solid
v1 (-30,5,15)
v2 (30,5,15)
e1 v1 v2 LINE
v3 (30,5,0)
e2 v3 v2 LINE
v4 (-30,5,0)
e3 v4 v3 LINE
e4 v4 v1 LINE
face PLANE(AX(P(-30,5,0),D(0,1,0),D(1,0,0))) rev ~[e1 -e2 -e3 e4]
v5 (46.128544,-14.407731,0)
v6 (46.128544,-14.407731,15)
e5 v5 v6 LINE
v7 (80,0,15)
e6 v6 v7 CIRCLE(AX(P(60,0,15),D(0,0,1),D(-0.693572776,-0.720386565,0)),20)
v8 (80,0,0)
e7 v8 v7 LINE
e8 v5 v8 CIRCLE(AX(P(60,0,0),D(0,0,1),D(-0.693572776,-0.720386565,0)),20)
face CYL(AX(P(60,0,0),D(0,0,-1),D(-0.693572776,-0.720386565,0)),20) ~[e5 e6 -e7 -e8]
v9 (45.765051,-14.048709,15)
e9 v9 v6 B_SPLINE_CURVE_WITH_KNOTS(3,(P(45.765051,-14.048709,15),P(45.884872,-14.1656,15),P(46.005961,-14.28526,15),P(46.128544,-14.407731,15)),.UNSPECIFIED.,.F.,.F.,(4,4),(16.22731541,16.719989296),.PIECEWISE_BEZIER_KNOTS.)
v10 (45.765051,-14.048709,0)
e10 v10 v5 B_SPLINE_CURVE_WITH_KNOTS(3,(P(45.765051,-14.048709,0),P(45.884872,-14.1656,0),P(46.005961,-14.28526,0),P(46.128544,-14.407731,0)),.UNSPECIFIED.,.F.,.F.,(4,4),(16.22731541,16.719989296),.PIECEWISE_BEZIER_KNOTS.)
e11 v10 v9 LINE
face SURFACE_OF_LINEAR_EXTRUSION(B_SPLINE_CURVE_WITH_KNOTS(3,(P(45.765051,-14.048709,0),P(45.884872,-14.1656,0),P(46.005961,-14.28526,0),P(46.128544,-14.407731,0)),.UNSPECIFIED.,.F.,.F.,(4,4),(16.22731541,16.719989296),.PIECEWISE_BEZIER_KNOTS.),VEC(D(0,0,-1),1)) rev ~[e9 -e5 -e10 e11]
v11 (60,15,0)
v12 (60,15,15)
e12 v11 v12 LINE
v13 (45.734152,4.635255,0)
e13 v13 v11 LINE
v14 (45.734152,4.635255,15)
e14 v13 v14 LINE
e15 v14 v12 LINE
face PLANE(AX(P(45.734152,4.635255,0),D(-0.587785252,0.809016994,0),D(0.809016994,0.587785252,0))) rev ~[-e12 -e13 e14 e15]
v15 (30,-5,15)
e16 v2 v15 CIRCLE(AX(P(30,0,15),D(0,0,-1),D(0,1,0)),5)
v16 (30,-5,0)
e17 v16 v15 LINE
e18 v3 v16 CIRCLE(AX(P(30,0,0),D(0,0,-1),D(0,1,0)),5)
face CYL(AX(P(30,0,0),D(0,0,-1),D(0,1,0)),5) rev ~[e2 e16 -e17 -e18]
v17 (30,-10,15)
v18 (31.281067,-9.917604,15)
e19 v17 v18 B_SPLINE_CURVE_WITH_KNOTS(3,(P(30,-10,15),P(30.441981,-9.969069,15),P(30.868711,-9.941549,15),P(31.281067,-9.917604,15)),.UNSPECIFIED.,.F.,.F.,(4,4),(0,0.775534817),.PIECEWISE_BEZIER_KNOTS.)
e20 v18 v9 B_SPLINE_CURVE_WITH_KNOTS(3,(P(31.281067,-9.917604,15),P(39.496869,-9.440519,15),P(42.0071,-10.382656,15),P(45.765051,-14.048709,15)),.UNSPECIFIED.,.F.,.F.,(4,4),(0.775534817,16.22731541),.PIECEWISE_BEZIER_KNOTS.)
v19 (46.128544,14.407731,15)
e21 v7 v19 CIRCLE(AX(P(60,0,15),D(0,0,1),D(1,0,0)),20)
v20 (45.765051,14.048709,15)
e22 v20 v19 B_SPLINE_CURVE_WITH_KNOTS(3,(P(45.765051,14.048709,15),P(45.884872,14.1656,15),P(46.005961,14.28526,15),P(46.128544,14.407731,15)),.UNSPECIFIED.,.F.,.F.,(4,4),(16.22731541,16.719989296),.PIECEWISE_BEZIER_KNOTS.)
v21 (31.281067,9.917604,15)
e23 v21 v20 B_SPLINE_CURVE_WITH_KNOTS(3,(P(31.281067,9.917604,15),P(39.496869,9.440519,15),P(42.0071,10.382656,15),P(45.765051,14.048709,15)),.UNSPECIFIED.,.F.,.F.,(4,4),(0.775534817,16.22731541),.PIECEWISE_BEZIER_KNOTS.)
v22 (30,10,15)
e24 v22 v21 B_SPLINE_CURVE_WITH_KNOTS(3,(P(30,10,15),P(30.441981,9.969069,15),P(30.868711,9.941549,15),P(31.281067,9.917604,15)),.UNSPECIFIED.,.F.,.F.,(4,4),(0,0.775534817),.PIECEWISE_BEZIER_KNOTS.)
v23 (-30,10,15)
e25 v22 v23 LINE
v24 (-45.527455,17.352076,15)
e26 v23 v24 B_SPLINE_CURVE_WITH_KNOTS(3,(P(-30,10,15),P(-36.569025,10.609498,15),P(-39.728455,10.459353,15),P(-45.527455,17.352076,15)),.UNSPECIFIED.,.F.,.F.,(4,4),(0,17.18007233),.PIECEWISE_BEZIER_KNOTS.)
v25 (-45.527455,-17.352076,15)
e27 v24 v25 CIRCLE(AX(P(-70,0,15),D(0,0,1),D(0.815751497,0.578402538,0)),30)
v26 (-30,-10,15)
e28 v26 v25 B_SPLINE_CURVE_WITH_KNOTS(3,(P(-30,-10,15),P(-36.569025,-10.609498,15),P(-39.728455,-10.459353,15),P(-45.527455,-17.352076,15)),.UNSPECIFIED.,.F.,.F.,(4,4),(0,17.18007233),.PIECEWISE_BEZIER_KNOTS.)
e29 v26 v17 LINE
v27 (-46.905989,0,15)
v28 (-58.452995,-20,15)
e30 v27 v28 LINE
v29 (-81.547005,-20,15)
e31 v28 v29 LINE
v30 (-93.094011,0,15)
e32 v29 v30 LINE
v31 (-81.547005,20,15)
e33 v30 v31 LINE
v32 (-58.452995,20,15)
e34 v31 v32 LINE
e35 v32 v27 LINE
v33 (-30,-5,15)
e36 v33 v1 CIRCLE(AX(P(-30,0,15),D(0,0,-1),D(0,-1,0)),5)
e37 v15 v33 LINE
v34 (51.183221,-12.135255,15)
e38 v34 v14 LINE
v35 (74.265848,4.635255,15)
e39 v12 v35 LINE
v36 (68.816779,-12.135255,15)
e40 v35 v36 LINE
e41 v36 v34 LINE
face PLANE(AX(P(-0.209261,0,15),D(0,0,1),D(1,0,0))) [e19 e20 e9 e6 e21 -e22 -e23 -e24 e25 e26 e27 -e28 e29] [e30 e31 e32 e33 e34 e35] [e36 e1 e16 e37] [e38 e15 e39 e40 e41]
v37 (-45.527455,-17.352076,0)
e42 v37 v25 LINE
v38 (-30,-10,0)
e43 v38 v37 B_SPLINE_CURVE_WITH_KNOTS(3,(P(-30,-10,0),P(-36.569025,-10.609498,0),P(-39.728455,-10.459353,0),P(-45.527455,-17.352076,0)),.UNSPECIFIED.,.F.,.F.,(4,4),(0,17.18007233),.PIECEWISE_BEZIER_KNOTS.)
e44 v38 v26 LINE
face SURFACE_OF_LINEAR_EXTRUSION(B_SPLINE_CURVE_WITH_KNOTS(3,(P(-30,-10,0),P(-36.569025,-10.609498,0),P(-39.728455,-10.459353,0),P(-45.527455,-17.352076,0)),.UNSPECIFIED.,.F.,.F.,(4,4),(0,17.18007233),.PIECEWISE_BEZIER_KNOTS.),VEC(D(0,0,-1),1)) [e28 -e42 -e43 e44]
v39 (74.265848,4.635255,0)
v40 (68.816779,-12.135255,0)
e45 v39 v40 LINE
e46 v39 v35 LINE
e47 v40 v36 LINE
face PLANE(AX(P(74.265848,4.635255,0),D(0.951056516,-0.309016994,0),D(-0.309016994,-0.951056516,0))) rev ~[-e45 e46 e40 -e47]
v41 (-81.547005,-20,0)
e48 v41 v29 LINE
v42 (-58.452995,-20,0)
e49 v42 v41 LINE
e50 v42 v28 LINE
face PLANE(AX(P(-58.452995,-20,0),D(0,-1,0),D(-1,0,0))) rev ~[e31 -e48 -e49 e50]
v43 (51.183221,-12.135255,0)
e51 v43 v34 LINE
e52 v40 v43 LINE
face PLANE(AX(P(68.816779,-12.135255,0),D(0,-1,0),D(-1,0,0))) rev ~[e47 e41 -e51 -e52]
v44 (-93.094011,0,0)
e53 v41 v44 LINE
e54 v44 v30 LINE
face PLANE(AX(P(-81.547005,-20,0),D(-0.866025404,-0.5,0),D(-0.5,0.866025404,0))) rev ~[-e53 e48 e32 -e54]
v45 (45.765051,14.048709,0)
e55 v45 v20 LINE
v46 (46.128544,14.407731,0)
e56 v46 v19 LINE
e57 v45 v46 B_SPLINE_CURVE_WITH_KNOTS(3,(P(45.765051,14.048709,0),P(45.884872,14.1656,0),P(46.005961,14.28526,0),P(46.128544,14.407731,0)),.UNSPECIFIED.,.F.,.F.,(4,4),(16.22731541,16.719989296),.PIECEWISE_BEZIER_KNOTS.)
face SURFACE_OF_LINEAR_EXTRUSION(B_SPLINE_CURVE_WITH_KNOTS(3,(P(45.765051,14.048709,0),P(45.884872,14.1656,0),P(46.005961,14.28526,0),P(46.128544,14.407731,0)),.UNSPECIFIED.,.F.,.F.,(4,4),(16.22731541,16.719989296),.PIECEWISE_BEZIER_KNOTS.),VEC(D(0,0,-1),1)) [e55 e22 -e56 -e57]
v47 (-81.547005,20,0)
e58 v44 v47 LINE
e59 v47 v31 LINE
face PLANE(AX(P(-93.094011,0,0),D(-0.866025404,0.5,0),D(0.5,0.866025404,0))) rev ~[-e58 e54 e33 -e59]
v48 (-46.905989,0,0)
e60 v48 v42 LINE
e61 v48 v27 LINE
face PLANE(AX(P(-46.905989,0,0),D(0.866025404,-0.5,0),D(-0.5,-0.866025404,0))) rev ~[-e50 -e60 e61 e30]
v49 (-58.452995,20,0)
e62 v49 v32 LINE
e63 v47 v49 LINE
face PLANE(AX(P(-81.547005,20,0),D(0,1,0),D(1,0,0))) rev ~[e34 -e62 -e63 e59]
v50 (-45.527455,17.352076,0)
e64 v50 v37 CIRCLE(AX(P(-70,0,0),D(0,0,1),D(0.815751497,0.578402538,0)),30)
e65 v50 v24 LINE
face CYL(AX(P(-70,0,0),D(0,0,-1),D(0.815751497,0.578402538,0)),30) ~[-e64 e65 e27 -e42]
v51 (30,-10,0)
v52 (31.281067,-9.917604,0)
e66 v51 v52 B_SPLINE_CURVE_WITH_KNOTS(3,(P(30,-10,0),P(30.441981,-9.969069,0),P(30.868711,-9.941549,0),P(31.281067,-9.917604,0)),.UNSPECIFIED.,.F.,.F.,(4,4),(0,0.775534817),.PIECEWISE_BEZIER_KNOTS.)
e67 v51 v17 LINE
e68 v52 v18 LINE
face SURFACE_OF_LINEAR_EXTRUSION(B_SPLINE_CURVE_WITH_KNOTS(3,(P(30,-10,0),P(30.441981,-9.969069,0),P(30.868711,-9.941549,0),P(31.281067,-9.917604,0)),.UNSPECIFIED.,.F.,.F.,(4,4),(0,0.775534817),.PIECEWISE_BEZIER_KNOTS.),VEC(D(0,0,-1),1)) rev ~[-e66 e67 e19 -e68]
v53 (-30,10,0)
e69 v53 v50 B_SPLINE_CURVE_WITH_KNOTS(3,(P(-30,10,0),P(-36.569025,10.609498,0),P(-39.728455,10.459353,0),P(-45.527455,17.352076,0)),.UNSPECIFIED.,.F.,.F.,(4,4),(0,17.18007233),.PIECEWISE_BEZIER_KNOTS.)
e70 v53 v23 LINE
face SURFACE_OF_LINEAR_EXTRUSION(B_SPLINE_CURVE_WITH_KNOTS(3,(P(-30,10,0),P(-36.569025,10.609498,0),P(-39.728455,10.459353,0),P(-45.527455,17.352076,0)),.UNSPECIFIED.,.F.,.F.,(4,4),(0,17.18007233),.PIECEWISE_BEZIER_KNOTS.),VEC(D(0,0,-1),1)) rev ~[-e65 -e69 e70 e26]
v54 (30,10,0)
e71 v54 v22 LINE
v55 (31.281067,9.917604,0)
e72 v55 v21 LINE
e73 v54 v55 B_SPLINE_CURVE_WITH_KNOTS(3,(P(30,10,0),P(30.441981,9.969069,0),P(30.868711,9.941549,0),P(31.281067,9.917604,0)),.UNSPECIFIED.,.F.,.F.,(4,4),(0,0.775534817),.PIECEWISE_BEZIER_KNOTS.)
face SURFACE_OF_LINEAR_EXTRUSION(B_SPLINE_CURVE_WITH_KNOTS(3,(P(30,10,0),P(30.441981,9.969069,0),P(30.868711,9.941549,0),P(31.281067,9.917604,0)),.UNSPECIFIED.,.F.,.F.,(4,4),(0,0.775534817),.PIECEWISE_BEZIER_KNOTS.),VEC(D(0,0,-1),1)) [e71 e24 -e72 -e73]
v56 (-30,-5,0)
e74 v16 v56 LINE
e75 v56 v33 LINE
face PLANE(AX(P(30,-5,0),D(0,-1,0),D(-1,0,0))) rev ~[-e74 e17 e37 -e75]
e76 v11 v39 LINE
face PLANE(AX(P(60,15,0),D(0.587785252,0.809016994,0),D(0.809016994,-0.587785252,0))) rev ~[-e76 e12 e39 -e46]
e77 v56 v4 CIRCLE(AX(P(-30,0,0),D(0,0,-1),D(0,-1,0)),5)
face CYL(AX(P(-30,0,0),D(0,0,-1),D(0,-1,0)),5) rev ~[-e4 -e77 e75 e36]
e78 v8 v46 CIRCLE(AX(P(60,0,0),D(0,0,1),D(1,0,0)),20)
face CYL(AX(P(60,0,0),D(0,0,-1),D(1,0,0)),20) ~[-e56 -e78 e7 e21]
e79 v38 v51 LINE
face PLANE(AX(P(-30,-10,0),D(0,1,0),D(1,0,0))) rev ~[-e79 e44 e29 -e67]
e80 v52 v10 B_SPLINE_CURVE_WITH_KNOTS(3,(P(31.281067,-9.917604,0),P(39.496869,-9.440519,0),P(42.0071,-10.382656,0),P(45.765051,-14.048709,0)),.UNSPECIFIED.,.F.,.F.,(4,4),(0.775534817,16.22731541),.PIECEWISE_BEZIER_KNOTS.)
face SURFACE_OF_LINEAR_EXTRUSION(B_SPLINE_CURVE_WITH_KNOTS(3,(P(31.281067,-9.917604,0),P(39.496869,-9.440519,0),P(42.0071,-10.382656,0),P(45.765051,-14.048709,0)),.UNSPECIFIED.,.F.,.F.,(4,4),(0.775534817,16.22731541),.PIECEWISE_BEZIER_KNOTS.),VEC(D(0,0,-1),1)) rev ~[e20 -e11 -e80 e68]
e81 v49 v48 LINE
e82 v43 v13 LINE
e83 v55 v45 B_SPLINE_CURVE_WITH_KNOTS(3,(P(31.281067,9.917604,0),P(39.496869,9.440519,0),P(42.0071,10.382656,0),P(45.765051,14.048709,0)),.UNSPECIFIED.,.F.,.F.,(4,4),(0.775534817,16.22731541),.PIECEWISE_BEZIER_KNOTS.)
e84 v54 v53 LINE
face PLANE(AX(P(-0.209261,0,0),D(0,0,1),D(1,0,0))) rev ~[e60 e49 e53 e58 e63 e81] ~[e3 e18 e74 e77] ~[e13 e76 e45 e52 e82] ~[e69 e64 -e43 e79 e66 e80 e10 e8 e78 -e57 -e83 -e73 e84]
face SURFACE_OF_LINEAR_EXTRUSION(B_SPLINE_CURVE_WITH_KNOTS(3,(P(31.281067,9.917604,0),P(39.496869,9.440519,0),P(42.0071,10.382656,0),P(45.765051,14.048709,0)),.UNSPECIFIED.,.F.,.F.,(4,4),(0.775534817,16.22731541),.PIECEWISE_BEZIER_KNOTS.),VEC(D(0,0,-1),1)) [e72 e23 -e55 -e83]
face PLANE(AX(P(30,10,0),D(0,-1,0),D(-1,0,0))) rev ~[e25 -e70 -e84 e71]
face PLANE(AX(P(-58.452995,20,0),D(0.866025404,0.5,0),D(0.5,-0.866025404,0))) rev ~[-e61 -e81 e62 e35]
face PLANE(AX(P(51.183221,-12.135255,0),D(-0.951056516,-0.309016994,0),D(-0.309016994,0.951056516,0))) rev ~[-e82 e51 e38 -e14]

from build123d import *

# Parameters (mm, degrees)
F1_DEPTH = 15


with BuildPart() as f1:
    # F0 (on Top) → F1 (new body)
    with BuildSketch(Plane.XY):
        with BuildLine():
            Line((30, 10), (-30, 10))
            ThreePointArc((-30, 10), (-37.0710678119, 7.0710678119), (-40, 0))
            ThreePointArc((-40, 0), (-37.0710678119, -7.0710678119), (-30, -10))
            Line((-30, -10), (30, -10))
            add(Edge.make_bspline(
                [(30, -10), (30.4419813549, -9.9690694458), (30.8687106597, -9.941549094), (31.2810670558, -9.9176039041)],
                knots=[0, 0, 0, 0, 0.775534817, 0.775534817, 0.775534817, 0.775534817], degree=3))
            ThreePointArc((31.2810670558, -9.9176039041), (37.51034856, -6.6026255768), (40, 4.32e-08))
            ThreePointArc((40, 4.32e-08), (37.5103485315, 6.6026256092), (31.2810670558, 9.9176039041))
            add(Edge.make_bspline(
                [(30, 10), (30.4419813549, 9.9690694458), (30.8687106597, 9.941549094), (31.2810670558, 9.9176039041)],
                knots=[0, 0, 0, 0, 0.775534817, 0.775534817, 0.775534817, 0.775534817], degree=3))
        make_face()
        with BuildLine():
            Line((30, -5), (-30, -5))
            ThreePointArc((-30, -5), (-35, 0), (-30, 5))
            Line((-30, 5), (30, 5))
            ThreePointArc((30, 5), (35, 0), (30, -5))
        make_face(mode=Mode.SUBTRACT)
        with BuildLine():
            ThreePointArc((-40, 0), (-37.0710678119, 7.0710678119), (-30, 10))
            add(Edge.make_bspline(
                [(-30, 10), (-36.5690253675, 10.6094982475), (-39.7284552455, 10.459353216), (-45.5274550985, 17.3520761307)],
                knots=[0, 0, 0, 0, 17.1800723301, 17.1800723301, 17.1800723301, 17.1800723301], degree=3))
            ThreePointArc((-45.5274550985, 17.3520761307), (-41.4152457852, 9.1055931426), (-40, 0))
        make_face()
        with BuildLine():
            ThreePointArc((-45.5274550985, -17.3520761307), (-41.4152457852, -9.1055931426), (-40, 0))
            ThreePointArc((-40, 0), (-41.4152457852, 9.1055931426), (-45.5274550985, 17.3520761307))
            ThreePointArc((-45.5274550985, 17.3520761307), (-100, 0), (-45.5274550985, -17.3520761307))
        make_face()
        Polygon((-93.0940107676, 0), (-81.5470053838, 20), (-58.4529946162, 20), (-46.9059892324, 0), (-58.4529946162, -20), (-81.5470053838, -20), align=None, mode=Mode.SUBTRACT)
        with BuildLine():
            ThreePointArc((-30, -10), (-37.0710678119, -7.0710678119), (-40, 0))
            ThreePointArc((-40, 0), (-41.4152457852, -9.1055931426), (-45.5274550985, -17.3520761307))
            add(Edge.make_bspline(
                [(-30, -10), (-36.5690253675, -10.6094982475), (-39.7284552455, -10.459353216), (-45.5274550985, -17.3520761307)],
                knots=[0, 0, 0, 0, 17.1800723301, 17.1800723301, 17.1800723301, 17.1800723301], degree=3))
        make_face()
        with BuildLine():
            add(Edge.make_bspline(
                [(31.2810670558, 9.9176039041), (39.496869131, 9.4405191711), (42.0070999801, 10.3826559201), (45.765051322, 14.0487094117)],
                knots=[0.775534817, 0.775534817, 0.775534817, 0.775534817, 16.2273154098, 16.2273154098, 16.2273154098, 16.2273154098], degree=3))
            ThreePointArc((31.2810670558, 9.9176039041), (37.5103485315, 6.6026256092), (40, 4.32e-08))
            ThreePointArc((40, 4.32e-08), (41.4973113717, 7.5927935257), (45.765051322, 14.0487094117))
        make_face()
        with BuildLine():
            ThreePointArc((45.765051322, -14.0487094117), (41.4973113553, -7.5927934857), (40, 4.32e-08))
            ThreePointArc((40, 4.32e-08), (37.51034856, -6.6026255768), (31.2810670558, -9.9176039041))
            add(Edge.make_bspline(
                [(31.2810670558, -9.9176039041), (39.496869131, -9.4405191711), (42.0070999801, -10.3826559201), (45.765051322, -14.0487094117)],
                knots=[0.775534817, 0.775534817, 0.775534817, 0.775534817, 16.2273154098, 16.2273154098, 16.2273154098, 16.2273154098], degree=3))
        make_face()
        with BuildLine():
            ThreePointArc((45.765051322, 14.0487094117), (41.4973113717, 7.5927935257), (40, 4.32e-08))
            ThreePointArc((40, 4.32e-08), (41.4973113553, -7.5927934857), (45.765051322, -14.0487094117))
            add(Edge.make_bspline(
                [(45.765051322, -14.0487094117), (45.8848721077, -14.1656000709), (46.0059613608, -14.2852599399), (46.1285444707, -14.4077313099)],
                knots=[16.2273154098, 16.2273154098, 16.2273154098, 16.2273154098, 16.7199892956, 16.7199892956, 16.7199892956, 16.7199892956], degree=3))
            ThreePointArc((46.1285444707, -14.4077313099), (67.828502073, -18.4041993929), (80, 0))
            ThreePointArc((80, 0), (67.828502073, 18.4041993929), (46.1285444707, 14.4077313099))
            add(Edge.make_bspline(
                [(45.765051322, 14.0487094117), (45.8848721077, 14.1656000709), (46.0059613608, 14.2852599399), (46.1285444707, 14.4077313099)],
                knots=[16.2273154098, 16.2273154098, 16.2273154098, 16.2273154098, 16.7199892956, 16.7199892956, 16.7199892956, 16.7199892956], degree=3))
        make_face()
        Polygon((45.7341522556, 4.6352549156), (60, 15), (74.2658477444, 4.6352549156), (68.8167787844, -12.1352549156), (51.1832212156, -12.1352549156), align=None, mode=Mode.SUBTRACT)
    extrude(amount=F1_DEPTH)


solid = f1.part
